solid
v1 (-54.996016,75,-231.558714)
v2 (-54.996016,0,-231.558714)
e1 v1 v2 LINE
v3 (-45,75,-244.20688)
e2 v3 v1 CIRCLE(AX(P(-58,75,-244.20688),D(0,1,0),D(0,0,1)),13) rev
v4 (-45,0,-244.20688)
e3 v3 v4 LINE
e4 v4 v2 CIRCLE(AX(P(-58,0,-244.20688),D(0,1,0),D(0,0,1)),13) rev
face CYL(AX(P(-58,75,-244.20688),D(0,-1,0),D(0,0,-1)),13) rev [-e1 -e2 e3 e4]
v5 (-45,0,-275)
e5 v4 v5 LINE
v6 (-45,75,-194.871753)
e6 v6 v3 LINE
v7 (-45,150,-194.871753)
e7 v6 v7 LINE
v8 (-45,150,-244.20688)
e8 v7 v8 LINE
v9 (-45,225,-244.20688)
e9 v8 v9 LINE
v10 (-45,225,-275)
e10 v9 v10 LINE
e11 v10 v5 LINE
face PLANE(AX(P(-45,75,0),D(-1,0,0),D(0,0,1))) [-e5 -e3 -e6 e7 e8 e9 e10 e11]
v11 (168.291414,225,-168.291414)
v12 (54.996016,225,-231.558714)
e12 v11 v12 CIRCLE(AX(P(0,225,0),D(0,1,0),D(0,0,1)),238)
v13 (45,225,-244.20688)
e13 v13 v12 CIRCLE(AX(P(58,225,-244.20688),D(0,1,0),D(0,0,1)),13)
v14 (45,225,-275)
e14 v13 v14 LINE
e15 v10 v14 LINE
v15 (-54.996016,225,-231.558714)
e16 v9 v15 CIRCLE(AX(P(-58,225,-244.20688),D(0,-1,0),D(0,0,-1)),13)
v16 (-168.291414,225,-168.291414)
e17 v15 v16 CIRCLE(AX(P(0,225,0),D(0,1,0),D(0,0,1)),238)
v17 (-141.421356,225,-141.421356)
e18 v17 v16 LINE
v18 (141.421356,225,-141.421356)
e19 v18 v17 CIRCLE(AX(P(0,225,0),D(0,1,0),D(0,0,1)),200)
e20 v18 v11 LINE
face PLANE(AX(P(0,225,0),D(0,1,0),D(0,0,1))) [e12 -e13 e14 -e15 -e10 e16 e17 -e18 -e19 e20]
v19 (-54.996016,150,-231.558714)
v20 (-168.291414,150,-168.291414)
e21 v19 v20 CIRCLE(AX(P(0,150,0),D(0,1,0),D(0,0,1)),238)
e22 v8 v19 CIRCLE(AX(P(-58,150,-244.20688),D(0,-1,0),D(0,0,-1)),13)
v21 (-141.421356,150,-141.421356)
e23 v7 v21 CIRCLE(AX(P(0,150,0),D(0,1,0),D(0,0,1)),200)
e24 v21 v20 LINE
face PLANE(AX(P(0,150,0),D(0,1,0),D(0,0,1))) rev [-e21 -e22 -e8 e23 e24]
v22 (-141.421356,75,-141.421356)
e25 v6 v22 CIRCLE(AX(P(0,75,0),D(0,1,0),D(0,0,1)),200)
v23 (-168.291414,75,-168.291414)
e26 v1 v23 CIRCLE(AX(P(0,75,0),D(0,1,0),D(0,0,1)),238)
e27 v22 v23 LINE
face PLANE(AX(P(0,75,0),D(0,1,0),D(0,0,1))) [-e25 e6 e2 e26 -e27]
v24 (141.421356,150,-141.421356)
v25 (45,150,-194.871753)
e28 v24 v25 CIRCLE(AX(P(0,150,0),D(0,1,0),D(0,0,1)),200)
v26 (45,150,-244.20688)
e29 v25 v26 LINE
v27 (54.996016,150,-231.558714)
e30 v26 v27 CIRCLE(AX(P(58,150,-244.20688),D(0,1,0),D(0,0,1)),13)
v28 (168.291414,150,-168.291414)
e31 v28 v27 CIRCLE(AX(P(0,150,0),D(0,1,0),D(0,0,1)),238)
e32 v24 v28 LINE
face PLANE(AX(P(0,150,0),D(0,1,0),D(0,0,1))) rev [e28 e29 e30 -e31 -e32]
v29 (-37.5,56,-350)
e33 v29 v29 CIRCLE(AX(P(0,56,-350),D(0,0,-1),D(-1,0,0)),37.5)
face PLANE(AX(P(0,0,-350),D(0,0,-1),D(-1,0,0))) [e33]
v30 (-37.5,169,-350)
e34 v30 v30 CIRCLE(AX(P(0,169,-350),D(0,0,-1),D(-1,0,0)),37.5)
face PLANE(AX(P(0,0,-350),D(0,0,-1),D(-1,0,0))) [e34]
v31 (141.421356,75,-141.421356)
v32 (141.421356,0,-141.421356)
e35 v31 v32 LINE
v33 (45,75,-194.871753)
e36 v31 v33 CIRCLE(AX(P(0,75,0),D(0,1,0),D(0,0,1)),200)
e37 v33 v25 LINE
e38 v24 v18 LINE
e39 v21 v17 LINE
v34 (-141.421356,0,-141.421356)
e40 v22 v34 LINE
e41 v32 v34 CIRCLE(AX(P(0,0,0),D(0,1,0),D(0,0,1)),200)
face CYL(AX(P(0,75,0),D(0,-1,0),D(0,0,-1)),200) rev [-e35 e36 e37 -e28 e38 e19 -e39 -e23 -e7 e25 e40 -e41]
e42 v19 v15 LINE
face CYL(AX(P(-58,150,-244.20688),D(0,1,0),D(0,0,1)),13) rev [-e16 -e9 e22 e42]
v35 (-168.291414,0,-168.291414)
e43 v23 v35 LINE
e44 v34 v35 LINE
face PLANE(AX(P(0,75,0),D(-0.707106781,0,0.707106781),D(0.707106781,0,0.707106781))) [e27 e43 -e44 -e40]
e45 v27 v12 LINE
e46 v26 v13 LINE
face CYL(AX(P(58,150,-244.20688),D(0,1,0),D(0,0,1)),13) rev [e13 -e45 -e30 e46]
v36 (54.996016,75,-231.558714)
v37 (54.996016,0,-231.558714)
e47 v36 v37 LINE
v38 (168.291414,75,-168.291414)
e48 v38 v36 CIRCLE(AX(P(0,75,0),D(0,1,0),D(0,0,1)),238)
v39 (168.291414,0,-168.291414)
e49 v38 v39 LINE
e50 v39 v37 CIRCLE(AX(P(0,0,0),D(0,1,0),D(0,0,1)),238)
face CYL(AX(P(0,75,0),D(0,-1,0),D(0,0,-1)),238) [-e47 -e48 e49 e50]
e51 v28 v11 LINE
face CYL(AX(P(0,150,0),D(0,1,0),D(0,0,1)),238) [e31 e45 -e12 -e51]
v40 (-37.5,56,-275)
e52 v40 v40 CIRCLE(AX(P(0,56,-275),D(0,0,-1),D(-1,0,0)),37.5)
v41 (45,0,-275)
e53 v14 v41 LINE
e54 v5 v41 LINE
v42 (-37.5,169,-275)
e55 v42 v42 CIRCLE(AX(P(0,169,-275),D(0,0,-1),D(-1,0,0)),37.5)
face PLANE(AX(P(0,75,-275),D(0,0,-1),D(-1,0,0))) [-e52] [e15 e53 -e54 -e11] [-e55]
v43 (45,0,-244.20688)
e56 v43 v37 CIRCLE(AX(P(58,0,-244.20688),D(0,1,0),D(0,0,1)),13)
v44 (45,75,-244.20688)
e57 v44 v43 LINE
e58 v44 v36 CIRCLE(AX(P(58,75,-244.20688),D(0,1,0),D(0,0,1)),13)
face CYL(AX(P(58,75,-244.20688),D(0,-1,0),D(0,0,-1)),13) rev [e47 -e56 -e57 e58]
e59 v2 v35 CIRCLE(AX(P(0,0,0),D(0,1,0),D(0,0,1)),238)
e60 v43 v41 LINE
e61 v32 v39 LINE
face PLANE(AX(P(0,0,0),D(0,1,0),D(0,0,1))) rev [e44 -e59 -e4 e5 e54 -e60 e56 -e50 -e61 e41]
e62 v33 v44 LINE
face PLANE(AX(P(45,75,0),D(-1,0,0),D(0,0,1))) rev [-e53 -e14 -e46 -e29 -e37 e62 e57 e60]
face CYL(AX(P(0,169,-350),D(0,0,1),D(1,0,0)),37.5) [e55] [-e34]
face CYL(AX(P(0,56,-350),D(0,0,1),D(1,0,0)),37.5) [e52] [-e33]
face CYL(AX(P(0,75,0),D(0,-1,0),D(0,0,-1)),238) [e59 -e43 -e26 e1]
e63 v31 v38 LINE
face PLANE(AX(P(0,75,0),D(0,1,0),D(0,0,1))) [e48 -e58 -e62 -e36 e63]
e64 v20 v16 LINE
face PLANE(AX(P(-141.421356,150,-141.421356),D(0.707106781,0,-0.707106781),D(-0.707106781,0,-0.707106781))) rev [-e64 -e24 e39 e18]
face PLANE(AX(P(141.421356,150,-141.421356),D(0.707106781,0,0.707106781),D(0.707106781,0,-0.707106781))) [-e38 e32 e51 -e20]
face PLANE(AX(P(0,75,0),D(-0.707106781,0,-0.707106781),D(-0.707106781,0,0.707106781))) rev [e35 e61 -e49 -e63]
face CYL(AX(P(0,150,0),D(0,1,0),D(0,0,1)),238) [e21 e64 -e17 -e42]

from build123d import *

# Parameters (mm, degrees)
BOSS_EXTRUDE1_DEPTH      = 75
BOSS_EXTRUDE2_START      = 225
BOSS_EXTRUDE2_DEPTH      = 75
BOSS_EXTRUDE4_REACH      = 313.111
BOSS_EXTRUDE4_END_RADIUS = 200
SKETCH4_W                = 90
SKETCH4_H                = 75
SKETCH4_6_R              = 37.5
BOSS_EXTRUDE5_DEPTH      = 75


with BuildPart() as part:
    # Sketch2 → Boss-Extrude1 (new body)
    with BuildSketch(Plane(origin=(0, 0, 0), x_dir=(1, 0, 0), z_dir=(0, 1, 0))):
        with BuildLine():
            ThreePointArc((-141.421356237, 141.421356237), (0, 200), (141.421356237, 141.421356237))
            Line((141.421356237, 141.421356237), (168.291413922, 168.291413922))
            ThreePointArc((168.291413922, 168.291413922), (116.038816401, 207.795555988), (54.996015936, 231.558714436))
            ThreePointArc((54.996015936, 231.558714436), (47.800691376, 236.146227949), (45, 244.20687951))
            Line((45, 244.20687951), (45, 275))
            Line((45, 275), (37.5, 275))
            Line((37.5, 275), (-37.5, 275))
            Line((-37.5, 275), (-45, 275))
            Line((-45, 275), (-45, 244.20687951))
            ThreePointArc((-45, 244.20687951), (-47.800691376, 236.146227949), (-54.996015936, 231.558714436))
            ThreePointArc((-54.996015936, 231.558714436), (-116.038816401, 207.795555988), (-168.291413922, 168.291413922))
            Line((-168.291413922, 168.291413922), (-141.421356237, 141.421356237))
        make_face()
    extrude(amount=BOSS_EXTRUDE1_DEPTH)



with BuildPart() as body_2:
    # Sketch2<3> → Boss-Extrude2 (new body)
    with BuildSketch(Plane(origin=(0, 0, 0), x_dir=(1, 0, 0), z_dir=(0, 1, 0)).offset(BOSS_EXTRUDE2_START)):
        with BuildLine():
            Line((141.421356237, 141.421356237), (168.291413922, 168.291413922))
            ThreePointArc((168.291413922, 168.291413922), (116.038816401, 207.795555988), (54.996015936, 231.558714436))
            ThreePointArc((54.996015936, 231.558714436), (47.800691376, 236.146227949), (45, 244.20687951))
            Line((45, 244.20687951), (45, 275))
            Line((45, 275), (-45, 275))
            Line((-45, 275), (-45, 244.20687951))
            ThreePointArc((-45, 244.20687951), (-47.800691376, 236.146227949), (-54.996015936, 231.558714436))
            ThreePointArc((-54.996015936, 231.558714436), (-116.038816401, 207.795555988), (-168.291413922, 168.291413922))
            Line((-168.291413922, 168.291413922), (-141.421356237, 141.421356237))
            ThreePointArc((-141.421356237, 141.421356237), (0, 200), (141.421356237, 141.421356237))
        make_face()
    extrude(amount=-BOSS_EXTRUDE2_DEPTH)


with BuildPart() as part_1:
    add(part.part)

    add(body_2.part)  # Boss-Extrude4 merges body 2
    # Boss-Extrude4: up to this cylinder (the profile starts outside it)
    boss_extrude4_end = Plane(origin=(0, 112.5, 0), z_dir=(0, 1, 0)) * Cylinder(BOSS_EXTRUDE4_END_RADIUS, 1027.222, mode=Mode.PRIVATE)
    # Sketch4 → Boss-Extrude4 (add, up to the surface)
    with BuildSketch(Plane(origin=(0, 0, -275), x_dir=(-1, 0, 0), z_dir=(0, 0, -1)), mode=Mode.PRIVATE) as boss_extrude4_sk1:
        with Locations((0, 112.5)):
            Rectangle(SKETCH4_W, SKETCH4_H)
    boss_extrude4_tool1 = extrude(boss_extrude4_sk1.sketch, amount=-BOSS_EXTRUDE4_REACH, mode=Mode.PRIVATE) - boss_extrude4_end
    add(boss_extrude4_tool1.solids().sort_by_distance((0, 112.5, -275))[0])

    # Sketch4<6> → Boss-Extrude5 (add)
    with BuildSketch(Plane(origin=(0, 0, -275), x_dir=(-1, 0, 0), z_dir=(0, 0, -1))):
        with Locations((0, 169)):
            Circle(SKETCH4_6_R)
        with Locations((0, 56)):
            Circle(SKETCH4_6_R)
    extrude(amount=BOSS_EXTRUDE5_DEPTH)


solid = part_1.part
